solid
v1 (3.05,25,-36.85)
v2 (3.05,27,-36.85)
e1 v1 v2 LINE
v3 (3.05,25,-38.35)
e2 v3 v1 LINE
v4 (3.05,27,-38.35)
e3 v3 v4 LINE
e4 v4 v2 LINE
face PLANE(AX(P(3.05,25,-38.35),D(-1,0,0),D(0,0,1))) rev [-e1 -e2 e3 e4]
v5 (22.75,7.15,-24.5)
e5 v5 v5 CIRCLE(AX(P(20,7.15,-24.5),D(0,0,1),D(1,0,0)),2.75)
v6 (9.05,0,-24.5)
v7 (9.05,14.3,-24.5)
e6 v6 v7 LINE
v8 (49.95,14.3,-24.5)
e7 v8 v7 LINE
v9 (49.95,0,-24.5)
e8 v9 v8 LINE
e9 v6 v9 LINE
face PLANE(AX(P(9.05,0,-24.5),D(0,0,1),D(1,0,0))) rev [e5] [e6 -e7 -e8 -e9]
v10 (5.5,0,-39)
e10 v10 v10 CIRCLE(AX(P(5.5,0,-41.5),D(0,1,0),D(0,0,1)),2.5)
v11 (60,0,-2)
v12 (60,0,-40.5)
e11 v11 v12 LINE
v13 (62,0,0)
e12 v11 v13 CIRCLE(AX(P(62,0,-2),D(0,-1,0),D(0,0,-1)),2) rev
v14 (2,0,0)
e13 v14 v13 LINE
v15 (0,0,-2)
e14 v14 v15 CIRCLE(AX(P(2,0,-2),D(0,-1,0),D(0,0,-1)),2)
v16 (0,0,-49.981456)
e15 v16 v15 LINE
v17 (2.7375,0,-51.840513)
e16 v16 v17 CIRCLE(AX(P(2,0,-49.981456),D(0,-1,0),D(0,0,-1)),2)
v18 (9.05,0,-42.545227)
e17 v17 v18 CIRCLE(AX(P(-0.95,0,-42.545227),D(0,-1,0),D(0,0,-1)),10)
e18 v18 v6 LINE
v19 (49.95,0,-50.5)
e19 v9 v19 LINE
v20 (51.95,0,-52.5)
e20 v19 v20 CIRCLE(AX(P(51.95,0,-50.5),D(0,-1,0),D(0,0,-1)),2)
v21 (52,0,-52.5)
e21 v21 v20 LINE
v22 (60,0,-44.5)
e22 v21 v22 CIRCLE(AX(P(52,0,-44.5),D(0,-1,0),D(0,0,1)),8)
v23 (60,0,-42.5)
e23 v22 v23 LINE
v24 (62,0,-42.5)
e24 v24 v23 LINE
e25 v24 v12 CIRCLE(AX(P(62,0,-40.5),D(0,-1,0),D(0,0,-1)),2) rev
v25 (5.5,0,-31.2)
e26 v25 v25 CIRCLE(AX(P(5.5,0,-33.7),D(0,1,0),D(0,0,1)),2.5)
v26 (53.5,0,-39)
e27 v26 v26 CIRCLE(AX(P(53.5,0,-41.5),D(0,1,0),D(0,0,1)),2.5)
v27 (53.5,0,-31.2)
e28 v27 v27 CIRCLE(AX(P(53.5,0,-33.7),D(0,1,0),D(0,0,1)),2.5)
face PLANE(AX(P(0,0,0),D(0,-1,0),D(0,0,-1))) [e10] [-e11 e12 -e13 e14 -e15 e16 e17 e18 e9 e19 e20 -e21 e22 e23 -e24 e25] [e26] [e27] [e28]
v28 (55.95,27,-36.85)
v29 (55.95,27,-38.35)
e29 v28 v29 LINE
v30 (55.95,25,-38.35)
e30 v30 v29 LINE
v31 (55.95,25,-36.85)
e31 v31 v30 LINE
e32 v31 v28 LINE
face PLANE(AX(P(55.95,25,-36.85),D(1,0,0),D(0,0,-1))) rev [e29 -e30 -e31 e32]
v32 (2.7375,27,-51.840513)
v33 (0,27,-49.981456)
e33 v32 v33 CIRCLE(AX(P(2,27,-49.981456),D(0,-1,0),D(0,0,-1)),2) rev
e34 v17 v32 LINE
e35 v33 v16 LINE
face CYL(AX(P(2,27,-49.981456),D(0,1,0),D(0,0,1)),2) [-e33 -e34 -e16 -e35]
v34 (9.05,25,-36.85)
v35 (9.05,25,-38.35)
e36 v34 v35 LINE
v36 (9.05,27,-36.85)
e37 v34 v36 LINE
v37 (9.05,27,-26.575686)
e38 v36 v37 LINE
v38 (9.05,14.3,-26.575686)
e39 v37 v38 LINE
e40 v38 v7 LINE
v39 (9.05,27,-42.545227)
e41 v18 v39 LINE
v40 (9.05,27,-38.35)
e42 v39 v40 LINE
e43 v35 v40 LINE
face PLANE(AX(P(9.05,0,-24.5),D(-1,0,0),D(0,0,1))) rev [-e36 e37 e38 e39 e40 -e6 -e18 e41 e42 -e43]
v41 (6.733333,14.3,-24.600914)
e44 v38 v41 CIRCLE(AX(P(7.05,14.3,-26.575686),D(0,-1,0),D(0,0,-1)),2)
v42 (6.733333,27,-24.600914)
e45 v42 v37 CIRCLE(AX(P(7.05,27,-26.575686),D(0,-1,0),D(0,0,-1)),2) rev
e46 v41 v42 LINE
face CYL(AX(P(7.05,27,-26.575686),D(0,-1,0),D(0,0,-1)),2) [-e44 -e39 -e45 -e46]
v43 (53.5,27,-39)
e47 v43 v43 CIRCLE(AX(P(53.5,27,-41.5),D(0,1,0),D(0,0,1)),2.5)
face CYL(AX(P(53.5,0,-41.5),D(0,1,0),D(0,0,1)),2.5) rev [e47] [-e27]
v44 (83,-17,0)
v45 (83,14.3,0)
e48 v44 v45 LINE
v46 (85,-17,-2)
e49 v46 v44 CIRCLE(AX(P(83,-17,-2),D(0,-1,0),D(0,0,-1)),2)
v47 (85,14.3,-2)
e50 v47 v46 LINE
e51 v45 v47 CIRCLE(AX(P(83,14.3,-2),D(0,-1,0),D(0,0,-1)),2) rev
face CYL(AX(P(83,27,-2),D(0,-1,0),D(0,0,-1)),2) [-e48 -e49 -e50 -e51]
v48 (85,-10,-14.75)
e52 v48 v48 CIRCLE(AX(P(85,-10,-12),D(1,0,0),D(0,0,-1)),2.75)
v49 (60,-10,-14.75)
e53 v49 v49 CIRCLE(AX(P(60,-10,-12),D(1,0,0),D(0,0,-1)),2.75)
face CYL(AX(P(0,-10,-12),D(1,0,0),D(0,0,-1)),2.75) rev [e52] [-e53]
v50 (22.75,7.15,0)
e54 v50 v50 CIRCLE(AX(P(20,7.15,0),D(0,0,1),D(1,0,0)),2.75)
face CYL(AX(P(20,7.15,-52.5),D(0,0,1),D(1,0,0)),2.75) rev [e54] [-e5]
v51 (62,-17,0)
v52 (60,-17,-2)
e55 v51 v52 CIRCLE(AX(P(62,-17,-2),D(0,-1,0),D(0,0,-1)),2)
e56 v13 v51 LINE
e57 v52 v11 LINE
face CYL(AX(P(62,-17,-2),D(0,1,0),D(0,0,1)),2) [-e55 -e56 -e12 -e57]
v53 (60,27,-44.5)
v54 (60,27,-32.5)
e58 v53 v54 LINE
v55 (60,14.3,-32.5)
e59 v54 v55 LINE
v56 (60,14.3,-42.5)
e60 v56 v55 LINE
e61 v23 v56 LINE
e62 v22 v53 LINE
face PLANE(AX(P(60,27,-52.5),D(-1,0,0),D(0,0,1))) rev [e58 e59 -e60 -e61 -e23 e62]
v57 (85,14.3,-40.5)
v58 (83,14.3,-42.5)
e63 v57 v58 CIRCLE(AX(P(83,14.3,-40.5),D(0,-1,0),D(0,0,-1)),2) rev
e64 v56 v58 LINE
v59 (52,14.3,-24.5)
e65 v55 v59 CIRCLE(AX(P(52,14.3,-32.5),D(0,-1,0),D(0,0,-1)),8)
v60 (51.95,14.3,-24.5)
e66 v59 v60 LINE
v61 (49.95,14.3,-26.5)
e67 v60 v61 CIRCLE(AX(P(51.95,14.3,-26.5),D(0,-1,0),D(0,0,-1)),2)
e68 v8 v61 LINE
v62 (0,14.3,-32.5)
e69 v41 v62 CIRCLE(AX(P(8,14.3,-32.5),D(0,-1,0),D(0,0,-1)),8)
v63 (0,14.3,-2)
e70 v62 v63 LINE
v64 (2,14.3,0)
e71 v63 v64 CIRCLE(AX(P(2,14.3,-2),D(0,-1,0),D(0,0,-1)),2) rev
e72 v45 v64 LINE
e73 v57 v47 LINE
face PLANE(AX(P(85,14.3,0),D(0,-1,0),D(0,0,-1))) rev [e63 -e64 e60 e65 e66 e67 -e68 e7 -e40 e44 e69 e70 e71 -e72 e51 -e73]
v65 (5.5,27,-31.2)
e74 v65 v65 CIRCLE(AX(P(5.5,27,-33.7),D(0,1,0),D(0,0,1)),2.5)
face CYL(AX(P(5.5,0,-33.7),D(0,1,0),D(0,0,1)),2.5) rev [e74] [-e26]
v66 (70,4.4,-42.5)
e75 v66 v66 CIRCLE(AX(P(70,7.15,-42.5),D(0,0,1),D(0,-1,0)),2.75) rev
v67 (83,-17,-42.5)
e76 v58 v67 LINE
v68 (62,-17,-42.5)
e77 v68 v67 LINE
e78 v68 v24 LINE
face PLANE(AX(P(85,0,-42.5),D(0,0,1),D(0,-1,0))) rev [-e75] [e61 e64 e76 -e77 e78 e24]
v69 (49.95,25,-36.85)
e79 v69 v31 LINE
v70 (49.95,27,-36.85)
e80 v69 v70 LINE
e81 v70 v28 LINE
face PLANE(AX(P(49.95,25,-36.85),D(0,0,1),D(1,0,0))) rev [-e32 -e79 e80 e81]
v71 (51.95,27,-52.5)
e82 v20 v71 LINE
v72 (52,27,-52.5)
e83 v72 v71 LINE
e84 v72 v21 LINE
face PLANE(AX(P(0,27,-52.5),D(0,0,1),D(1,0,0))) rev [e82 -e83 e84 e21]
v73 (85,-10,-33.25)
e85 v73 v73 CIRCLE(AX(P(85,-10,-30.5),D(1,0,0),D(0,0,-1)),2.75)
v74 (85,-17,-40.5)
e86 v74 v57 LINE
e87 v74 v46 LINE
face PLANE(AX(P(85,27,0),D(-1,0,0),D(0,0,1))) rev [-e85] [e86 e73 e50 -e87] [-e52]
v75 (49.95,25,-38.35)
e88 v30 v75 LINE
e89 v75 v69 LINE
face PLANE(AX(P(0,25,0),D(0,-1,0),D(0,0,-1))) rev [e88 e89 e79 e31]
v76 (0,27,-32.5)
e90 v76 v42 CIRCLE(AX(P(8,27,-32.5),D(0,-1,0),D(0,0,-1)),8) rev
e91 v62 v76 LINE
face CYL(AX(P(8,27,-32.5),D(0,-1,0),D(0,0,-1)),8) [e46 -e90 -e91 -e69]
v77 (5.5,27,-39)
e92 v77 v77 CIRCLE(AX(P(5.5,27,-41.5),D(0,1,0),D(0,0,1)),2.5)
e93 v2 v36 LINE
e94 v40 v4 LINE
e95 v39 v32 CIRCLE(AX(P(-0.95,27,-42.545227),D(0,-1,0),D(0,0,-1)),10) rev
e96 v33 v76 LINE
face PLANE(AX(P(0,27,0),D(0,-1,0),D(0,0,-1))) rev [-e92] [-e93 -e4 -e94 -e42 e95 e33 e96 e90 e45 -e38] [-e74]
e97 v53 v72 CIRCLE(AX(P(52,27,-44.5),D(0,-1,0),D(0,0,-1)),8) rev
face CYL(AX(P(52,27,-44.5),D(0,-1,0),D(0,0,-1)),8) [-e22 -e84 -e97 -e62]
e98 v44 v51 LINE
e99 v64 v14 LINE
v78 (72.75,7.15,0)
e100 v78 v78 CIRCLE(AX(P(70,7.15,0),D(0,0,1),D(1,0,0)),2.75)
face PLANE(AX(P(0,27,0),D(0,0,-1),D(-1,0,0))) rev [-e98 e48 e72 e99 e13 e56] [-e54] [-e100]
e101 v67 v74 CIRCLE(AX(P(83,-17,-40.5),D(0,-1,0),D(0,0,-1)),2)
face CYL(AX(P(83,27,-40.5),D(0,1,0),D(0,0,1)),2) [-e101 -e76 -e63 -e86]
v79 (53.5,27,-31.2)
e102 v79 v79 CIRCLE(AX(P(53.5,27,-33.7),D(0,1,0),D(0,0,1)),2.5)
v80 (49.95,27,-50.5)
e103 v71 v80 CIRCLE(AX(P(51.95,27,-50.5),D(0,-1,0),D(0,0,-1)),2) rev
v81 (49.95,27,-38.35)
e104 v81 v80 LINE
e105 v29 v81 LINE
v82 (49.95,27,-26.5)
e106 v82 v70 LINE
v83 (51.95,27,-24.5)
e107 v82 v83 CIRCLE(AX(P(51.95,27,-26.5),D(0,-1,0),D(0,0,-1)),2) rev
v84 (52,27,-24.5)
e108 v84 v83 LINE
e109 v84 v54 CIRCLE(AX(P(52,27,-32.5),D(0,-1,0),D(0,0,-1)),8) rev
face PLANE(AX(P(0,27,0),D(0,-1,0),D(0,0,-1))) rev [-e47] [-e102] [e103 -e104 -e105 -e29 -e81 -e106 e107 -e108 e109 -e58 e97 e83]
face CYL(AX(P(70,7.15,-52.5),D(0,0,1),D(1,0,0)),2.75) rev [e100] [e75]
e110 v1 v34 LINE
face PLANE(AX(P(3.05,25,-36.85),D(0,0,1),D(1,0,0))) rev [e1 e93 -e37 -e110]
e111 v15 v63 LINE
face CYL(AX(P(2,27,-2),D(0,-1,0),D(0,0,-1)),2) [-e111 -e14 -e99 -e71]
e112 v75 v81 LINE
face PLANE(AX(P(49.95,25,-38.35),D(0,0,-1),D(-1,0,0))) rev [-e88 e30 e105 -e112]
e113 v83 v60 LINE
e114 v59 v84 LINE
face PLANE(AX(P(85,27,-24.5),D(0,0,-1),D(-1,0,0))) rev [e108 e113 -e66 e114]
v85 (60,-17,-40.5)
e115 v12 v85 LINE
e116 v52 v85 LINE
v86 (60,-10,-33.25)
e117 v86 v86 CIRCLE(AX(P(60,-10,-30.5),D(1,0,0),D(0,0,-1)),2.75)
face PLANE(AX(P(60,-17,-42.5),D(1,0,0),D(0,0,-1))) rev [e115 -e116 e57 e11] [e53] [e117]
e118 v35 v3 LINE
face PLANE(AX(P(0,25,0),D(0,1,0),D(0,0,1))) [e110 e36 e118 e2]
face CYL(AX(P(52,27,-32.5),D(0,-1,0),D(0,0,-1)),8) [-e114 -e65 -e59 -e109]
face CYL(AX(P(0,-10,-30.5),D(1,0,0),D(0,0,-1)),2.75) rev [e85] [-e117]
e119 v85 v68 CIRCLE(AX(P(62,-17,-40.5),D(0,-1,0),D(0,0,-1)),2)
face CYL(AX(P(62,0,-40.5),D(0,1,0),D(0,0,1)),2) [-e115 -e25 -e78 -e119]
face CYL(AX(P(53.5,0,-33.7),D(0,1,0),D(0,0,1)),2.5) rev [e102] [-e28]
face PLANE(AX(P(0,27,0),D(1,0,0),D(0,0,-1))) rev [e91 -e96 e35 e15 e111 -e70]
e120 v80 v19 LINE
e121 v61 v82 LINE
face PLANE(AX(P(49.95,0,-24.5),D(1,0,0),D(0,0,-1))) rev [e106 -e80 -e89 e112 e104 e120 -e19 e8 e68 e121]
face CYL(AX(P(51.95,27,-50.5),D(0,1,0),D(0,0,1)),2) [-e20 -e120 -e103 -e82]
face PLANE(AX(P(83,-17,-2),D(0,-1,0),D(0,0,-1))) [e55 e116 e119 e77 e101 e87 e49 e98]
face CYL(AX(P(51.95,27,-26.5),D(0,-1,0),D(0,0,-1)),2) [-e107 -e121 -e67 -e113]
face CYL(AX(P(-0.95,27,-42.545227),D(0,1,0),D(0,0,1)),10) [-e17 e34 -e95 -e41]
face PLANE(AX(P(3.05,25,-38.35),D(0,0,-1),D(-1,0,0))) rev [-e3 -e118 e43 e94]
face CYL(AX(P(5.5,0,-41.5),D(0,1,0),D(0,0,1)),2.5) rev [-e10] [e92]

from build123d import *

# Parameters (mm, degrees)
SKETCH1_W           = 85
SKETCH1_H           = 52.5
BOSS_EXTRUDE1_DEPTH = 27
SKETCH2_R           = 2.5
CUT_EXTRUDE1_DEPTH  = 104.490337713
SKETCH4_W           = 24.5
SKETCH4_H           = 12.7
CUT_EXTRUDE2_DEPTH  = 104.490337713
SKETCH5_W           = 25
SKETCH5_H           = 12.7
CUT_EXTRUDE3_DEPTH  = 94.477269964
SKETCH6_W           = 40.9
SKETCH6_H           = 28
CUT_EXTRUDE4_DEPTH  = 104.490337713
FILLET1_R           = 10
FILLET2_R           = 8
FILLET4_R           = 2
SKETCH7_R           = 2.75
CUT_EXTRUDE5_DEPTH  = 104.490337713
SKETCH8_W           = 6
SKETCH8_H           = 1.5
CUT_EXTRUDE6_DEPTH  = 2
CUT_EXTRUDE7_DEPTH  = 101.924427172
BOSS_EXTRUDE2_START = 17
BOSS_EXTRUDE2_DEPTH = 17
SKETCH11_R          = 2.75
CUT_EXTRUDE8_DEPTH  = 104.490337713
FILLET5_R           = 2


with BuildPart() as part:
    # Sketch1 → Boss-Extrude1 (new body)
    with BuildSketch(Plane(origin=(0, 0, 0), x_dir=(1, 0, 0), z_dir=(0, 1, 0))):
        with Locations((42.5, 26.25)):
            Rectangle(SKETCH1_W, SKETCH1_H)
    extrude(amount=BOSS_EXTRUDE1_DEPTH)

    # Sketch2 → Cut-Extrude1 (cut, through all)
    with BuildSketch(Plane(origin=(0, 27, 0), x_dir=(1, 0, 0), z_dir=(0, 1, 0))):
        with Locations(Location((5.5, 41.5, 0), (0, 0, 270))):
            Circle(SKETCH2_R)
        with Locations(Location((53.5, 41.5, 0), (0, 0, 270))):
            Circle(SKETCH2_R)
        with Locations(Location((53.5, 33.7, 0), (0, 0, 270))):
            Circle(SKETCH2_R)
        with Locations(Location((5.5, 33.7, 0), (0, 0, 270))):
            Circle(SKETCH2_R)
    extrude(amount=-CUT_EXTRUDE1_DEPTH, mode=Mode.SUBTRACT)

    # Sketch4 → Cut-Extrude2 (cut, through all)
    with BuildSketch(Plane.ZY):
        with Locations((-12.25, 20.65)):
            Rectangle(SKETCH4_W, SKETCH4_H)
    extrude(amount=-CUT_EXTRUDE2_DEPTH, mode=Mode.SUBTRACT)

    # Sketch5 → Cut-Extrude3 (cut, through all)
    with BuildSketch(Plane.XY.offset(-24.5)):
        with Locations((72.5, 20.65)):
            Rectangle(SKETCH5_W, SKETCH5_H)
    extrude(amount=-CUT_EXTRUDE3_DEPTH, mode=Mode.SUBTRACT)

    # Sketch6 → Cut-Extrude4 (cut, through all)
    with BuildSketch(Plane(origin=(0, 27, 0), x_dir=(1, 0, 0), z_dir=(0, 1, 0))):
        with Locations((29.5, 38.5)):
            Rectangle(SKETCH6_W, SKETCH6_H)
    extrude(amount=-CUT_EXTRUDE4_DEPTH, mode=Mode.SUBTRACT)

    # Fillet1
    # the kernel refuses this fillet: 10 mm, written as the material it takes off along each edge
    with BuildSketch(Plane(origin=(9.05, 51.886931812, -52.5), x_dir=(-1, 0, 0), z_dir=(0, -1, 0))) as fillet1_piece_1:
        with BuildLine():
            CenterArc((10, -9.954772725), FILLET1_R, 95.451319812, 84.548680188)
            Line((0, -9.954772725), (-0.2, -9.954772725))
            Line((-0.2, -9.954772725), (-0.2, 0))
            Line((-0.2, 0), (0, 0.2))
            ThreePointArc((0, 0.2), (4.525, 0.2), (9.031, 0.199095454))
            Line((9.031, 0.199095454), (9.05, 0))
        make_face()
    extrude(amount=76.773863623, mode=Mode.SUBTRACT)

    # Fillet2
    fillet2_edges = [part.edges().sort_by_distance(p)[0] for p in [
        (0, 20.65, -24.5),
        (60, 20.65, -52.5),
        (60, 20.65, -24.5),
    ]]
    fillet(fillet2_edges, radius=FILLET2_R)

    # Fillet4
    # the kernel refuses this fillet: 2 mm, written as the material it takes off along each edge
    with BuildSketch(Plane(origin=(9.05, 32.797158858, -24.5), x_dir=(0, 0, -1), z_dir=(0, -1, 0))) as fillet4_piece_1:
        with BuildLine():
            CenterArc((2.075685694, -2), FILLET4_R, 90, 99.110170153)
            Line((0.100914258, -2.316666667), (-0.096562885, -2.348333333))
            ThreePointArc((-0.096562885, -2.348333333), (-0.2, -1.05), (-0.2, 0))
            Line((-0.2, 0), (0, 0.2))
            Line((0, 0.2), (2.075685694, 0.2))
            Line((2.075685694, 0.2), (2.075685694, 0))
        make_face()
    extrude(amount=18.497158858, mode=Mode.SUBTRACT)
    with BuildSketch(Plane(origin=(49.95, 32, -24.5), x_dir=(0, 0, -1), z_dir=(0, -1, 0))) as fillet4_piece_2:
        with BuildLine():
            CenterArc((FILLET4_R, FILLET4_R), FILLET4_R, 180, 90)
            Line((0, FILLET4_R), (0, 0))
            Line((0, 0), (FILLET4_R, 0))
        make_face()
    extrude(amount=17.7, mode=Mode.SUBTRACT)
    with BuildSketch(Plane(origin=(49.95, 32, -52.5), x_dir=(0, 0, 1), z_dir=(0, -1, 0))) as fillet4_piece_3:
        with BuildLine():
            CenterArc((FILLET4_R, -FILLET4_R), FILLET4_R, 90, 90)
            Line((0, -FILLET4_R), (0, 0))
            Line((0, 0), (FILLET4_R, 0))
        make_face()
    extrude(amount=37, mode=Mode.SUBTRACT)
    with BuildSketch(Plane(origin=(85, -5, -52.5), x_dir=(0, 0, 1), z_dir=(0, 1, 0)), Plane(origin=(85, -5, 0), x_dir=(-1, 0, 0), z_dir=(0, 1, 0)), Plane(origin=(0, -5, 0), x_dir=(0, 0, -1), z_dir=(0, 1, 0))) as fillet4_piece_4:
        with BuildLine():
            CenterArc((FILLET4_R, -FILLET4_R), FILLET4_R, 90, 90)
            Line((0, -FILLET4_R), (0, 0))
            Line((0, 0), (FILLET4_R, 0))
        make_face()
    extrude(amount=24.3, mode=Mode.SUBTRACT)
    with BuildSketch(Plane(origin=(0, -7.039544043, -52.5), x_dir=(0.972186544788057, 0, 0.23420786095487744), z_dir=(0, 1, 0))) as fillet4_piece_5:
        with BuildLine():
            CenterArc((2.534235855, -1.980078713), FILLET4_R, 81.906386313, 111.638547186)
            Line((0.589862766, -2.448494435), (0, 0))
            ThreePointArc((0, 0), (1.407908809, 0.099606433), (2.815817617, 0))
        make_face()
    extrude(amount=41.079088086, mode=Mode.SUBTRACT)

    # Sketch7 → Cut-Extrude5 (cut, through all)
    with BuildSketch(Plane.XY):
        with Locations((70, 7.15)):
            Circle(SKETCH7_R)
        with Locations((20, 7.15)):
            Circle(SKETCH7_R)
    extrude(amount=-CUT_EXTRUDE5_DEPTH, mode=Mode.SUBTRACT)

    # Sketch8 → Cut-Extrude6 (cut)
    with BuildSketch(Plane(origin=(0, 27, 0), x_dir=(1, 0, 0), z_dir=(0, 1, 0))):
        with Locations((6.05, 37.6)):
            Rectangle(SKETCH8_W, SKETCH8_H)
        with Locations((52.95, 37.6)):
            Rectangle(SKETCH8_W, SKETCH8_H)
    extrude(amount=-CUT_EXTRUDE6_DEPTH, mode=Mode.SUBTRACT)

    # Sketch9 → Cut-Extrude7 (cut, through all)
    with BuildSketch(Plane(origin=(0, 14.3, 0), x_dir=(1, 0, 0), z_dir=(0, 1, 0))):
        with BuildLine():
            Line((85, 42.5), (60, 42.5))
            Line((60, 42.5), (60, 44.5))
            ThreePointArc((60, 44.5), (57.656854249, 50.156854249), (52, 52.5))
            Line((52, 52.5), (83, 52.5))
            Line((83, 52.5), (85, 52.5))
            Line((85, 52.5), (85, 42.5))
        make_face()
    extrude(amount=-CUT_EXTRUDE7_DEPTH, mode=Mode.SUBTRACT)

    # Sketch10 → Boss-Extrude2 (add)
    with BuildSketch(Plane.XZ.offset(BOSS_EXTRUDE2_START)):
        with BuildLine():
            Line((85, -42.5), (60, -42.5))
            Line((60, -42.5), (60, 0))
            Line((60, 0), (83, 0))
            ThreePointArc((83, 0), (84.414213562, -0.585786438), (85, -2))
            Line((85, -2), (85, -42.5))
        make_face()
    extrude(amount=-BOSS_EXTRUDE2_DEPTH)

    # Sketch11 → Cut-Extrude8 (cut, through all)
    with BuildSketch(Plane(origin=(85, 0, 0), x_dir=(0, 0, -1), z_dir=(1, 0, 0))):
        with Locations((30.5, -10)):
            Circle(SKETCH11_R)
        with Locations((12, -10)):
            Circle(SKETCH11_R)
    extrude(amount=-CUT_EXTRUDE8_DEPTH, mode=Mode.SUBTRACT)

    # Fillet5
    fillet5_edges = [part.edges().sort_by_distance(p)[0] for p in [
        (85, -1.35, -42.5),
        (60, -8.5, 0),
        (60, -8.5, -42.5),
    ]]
    fillet(fillet5_edges, radius=FILLET5_R)


solid = part.part
